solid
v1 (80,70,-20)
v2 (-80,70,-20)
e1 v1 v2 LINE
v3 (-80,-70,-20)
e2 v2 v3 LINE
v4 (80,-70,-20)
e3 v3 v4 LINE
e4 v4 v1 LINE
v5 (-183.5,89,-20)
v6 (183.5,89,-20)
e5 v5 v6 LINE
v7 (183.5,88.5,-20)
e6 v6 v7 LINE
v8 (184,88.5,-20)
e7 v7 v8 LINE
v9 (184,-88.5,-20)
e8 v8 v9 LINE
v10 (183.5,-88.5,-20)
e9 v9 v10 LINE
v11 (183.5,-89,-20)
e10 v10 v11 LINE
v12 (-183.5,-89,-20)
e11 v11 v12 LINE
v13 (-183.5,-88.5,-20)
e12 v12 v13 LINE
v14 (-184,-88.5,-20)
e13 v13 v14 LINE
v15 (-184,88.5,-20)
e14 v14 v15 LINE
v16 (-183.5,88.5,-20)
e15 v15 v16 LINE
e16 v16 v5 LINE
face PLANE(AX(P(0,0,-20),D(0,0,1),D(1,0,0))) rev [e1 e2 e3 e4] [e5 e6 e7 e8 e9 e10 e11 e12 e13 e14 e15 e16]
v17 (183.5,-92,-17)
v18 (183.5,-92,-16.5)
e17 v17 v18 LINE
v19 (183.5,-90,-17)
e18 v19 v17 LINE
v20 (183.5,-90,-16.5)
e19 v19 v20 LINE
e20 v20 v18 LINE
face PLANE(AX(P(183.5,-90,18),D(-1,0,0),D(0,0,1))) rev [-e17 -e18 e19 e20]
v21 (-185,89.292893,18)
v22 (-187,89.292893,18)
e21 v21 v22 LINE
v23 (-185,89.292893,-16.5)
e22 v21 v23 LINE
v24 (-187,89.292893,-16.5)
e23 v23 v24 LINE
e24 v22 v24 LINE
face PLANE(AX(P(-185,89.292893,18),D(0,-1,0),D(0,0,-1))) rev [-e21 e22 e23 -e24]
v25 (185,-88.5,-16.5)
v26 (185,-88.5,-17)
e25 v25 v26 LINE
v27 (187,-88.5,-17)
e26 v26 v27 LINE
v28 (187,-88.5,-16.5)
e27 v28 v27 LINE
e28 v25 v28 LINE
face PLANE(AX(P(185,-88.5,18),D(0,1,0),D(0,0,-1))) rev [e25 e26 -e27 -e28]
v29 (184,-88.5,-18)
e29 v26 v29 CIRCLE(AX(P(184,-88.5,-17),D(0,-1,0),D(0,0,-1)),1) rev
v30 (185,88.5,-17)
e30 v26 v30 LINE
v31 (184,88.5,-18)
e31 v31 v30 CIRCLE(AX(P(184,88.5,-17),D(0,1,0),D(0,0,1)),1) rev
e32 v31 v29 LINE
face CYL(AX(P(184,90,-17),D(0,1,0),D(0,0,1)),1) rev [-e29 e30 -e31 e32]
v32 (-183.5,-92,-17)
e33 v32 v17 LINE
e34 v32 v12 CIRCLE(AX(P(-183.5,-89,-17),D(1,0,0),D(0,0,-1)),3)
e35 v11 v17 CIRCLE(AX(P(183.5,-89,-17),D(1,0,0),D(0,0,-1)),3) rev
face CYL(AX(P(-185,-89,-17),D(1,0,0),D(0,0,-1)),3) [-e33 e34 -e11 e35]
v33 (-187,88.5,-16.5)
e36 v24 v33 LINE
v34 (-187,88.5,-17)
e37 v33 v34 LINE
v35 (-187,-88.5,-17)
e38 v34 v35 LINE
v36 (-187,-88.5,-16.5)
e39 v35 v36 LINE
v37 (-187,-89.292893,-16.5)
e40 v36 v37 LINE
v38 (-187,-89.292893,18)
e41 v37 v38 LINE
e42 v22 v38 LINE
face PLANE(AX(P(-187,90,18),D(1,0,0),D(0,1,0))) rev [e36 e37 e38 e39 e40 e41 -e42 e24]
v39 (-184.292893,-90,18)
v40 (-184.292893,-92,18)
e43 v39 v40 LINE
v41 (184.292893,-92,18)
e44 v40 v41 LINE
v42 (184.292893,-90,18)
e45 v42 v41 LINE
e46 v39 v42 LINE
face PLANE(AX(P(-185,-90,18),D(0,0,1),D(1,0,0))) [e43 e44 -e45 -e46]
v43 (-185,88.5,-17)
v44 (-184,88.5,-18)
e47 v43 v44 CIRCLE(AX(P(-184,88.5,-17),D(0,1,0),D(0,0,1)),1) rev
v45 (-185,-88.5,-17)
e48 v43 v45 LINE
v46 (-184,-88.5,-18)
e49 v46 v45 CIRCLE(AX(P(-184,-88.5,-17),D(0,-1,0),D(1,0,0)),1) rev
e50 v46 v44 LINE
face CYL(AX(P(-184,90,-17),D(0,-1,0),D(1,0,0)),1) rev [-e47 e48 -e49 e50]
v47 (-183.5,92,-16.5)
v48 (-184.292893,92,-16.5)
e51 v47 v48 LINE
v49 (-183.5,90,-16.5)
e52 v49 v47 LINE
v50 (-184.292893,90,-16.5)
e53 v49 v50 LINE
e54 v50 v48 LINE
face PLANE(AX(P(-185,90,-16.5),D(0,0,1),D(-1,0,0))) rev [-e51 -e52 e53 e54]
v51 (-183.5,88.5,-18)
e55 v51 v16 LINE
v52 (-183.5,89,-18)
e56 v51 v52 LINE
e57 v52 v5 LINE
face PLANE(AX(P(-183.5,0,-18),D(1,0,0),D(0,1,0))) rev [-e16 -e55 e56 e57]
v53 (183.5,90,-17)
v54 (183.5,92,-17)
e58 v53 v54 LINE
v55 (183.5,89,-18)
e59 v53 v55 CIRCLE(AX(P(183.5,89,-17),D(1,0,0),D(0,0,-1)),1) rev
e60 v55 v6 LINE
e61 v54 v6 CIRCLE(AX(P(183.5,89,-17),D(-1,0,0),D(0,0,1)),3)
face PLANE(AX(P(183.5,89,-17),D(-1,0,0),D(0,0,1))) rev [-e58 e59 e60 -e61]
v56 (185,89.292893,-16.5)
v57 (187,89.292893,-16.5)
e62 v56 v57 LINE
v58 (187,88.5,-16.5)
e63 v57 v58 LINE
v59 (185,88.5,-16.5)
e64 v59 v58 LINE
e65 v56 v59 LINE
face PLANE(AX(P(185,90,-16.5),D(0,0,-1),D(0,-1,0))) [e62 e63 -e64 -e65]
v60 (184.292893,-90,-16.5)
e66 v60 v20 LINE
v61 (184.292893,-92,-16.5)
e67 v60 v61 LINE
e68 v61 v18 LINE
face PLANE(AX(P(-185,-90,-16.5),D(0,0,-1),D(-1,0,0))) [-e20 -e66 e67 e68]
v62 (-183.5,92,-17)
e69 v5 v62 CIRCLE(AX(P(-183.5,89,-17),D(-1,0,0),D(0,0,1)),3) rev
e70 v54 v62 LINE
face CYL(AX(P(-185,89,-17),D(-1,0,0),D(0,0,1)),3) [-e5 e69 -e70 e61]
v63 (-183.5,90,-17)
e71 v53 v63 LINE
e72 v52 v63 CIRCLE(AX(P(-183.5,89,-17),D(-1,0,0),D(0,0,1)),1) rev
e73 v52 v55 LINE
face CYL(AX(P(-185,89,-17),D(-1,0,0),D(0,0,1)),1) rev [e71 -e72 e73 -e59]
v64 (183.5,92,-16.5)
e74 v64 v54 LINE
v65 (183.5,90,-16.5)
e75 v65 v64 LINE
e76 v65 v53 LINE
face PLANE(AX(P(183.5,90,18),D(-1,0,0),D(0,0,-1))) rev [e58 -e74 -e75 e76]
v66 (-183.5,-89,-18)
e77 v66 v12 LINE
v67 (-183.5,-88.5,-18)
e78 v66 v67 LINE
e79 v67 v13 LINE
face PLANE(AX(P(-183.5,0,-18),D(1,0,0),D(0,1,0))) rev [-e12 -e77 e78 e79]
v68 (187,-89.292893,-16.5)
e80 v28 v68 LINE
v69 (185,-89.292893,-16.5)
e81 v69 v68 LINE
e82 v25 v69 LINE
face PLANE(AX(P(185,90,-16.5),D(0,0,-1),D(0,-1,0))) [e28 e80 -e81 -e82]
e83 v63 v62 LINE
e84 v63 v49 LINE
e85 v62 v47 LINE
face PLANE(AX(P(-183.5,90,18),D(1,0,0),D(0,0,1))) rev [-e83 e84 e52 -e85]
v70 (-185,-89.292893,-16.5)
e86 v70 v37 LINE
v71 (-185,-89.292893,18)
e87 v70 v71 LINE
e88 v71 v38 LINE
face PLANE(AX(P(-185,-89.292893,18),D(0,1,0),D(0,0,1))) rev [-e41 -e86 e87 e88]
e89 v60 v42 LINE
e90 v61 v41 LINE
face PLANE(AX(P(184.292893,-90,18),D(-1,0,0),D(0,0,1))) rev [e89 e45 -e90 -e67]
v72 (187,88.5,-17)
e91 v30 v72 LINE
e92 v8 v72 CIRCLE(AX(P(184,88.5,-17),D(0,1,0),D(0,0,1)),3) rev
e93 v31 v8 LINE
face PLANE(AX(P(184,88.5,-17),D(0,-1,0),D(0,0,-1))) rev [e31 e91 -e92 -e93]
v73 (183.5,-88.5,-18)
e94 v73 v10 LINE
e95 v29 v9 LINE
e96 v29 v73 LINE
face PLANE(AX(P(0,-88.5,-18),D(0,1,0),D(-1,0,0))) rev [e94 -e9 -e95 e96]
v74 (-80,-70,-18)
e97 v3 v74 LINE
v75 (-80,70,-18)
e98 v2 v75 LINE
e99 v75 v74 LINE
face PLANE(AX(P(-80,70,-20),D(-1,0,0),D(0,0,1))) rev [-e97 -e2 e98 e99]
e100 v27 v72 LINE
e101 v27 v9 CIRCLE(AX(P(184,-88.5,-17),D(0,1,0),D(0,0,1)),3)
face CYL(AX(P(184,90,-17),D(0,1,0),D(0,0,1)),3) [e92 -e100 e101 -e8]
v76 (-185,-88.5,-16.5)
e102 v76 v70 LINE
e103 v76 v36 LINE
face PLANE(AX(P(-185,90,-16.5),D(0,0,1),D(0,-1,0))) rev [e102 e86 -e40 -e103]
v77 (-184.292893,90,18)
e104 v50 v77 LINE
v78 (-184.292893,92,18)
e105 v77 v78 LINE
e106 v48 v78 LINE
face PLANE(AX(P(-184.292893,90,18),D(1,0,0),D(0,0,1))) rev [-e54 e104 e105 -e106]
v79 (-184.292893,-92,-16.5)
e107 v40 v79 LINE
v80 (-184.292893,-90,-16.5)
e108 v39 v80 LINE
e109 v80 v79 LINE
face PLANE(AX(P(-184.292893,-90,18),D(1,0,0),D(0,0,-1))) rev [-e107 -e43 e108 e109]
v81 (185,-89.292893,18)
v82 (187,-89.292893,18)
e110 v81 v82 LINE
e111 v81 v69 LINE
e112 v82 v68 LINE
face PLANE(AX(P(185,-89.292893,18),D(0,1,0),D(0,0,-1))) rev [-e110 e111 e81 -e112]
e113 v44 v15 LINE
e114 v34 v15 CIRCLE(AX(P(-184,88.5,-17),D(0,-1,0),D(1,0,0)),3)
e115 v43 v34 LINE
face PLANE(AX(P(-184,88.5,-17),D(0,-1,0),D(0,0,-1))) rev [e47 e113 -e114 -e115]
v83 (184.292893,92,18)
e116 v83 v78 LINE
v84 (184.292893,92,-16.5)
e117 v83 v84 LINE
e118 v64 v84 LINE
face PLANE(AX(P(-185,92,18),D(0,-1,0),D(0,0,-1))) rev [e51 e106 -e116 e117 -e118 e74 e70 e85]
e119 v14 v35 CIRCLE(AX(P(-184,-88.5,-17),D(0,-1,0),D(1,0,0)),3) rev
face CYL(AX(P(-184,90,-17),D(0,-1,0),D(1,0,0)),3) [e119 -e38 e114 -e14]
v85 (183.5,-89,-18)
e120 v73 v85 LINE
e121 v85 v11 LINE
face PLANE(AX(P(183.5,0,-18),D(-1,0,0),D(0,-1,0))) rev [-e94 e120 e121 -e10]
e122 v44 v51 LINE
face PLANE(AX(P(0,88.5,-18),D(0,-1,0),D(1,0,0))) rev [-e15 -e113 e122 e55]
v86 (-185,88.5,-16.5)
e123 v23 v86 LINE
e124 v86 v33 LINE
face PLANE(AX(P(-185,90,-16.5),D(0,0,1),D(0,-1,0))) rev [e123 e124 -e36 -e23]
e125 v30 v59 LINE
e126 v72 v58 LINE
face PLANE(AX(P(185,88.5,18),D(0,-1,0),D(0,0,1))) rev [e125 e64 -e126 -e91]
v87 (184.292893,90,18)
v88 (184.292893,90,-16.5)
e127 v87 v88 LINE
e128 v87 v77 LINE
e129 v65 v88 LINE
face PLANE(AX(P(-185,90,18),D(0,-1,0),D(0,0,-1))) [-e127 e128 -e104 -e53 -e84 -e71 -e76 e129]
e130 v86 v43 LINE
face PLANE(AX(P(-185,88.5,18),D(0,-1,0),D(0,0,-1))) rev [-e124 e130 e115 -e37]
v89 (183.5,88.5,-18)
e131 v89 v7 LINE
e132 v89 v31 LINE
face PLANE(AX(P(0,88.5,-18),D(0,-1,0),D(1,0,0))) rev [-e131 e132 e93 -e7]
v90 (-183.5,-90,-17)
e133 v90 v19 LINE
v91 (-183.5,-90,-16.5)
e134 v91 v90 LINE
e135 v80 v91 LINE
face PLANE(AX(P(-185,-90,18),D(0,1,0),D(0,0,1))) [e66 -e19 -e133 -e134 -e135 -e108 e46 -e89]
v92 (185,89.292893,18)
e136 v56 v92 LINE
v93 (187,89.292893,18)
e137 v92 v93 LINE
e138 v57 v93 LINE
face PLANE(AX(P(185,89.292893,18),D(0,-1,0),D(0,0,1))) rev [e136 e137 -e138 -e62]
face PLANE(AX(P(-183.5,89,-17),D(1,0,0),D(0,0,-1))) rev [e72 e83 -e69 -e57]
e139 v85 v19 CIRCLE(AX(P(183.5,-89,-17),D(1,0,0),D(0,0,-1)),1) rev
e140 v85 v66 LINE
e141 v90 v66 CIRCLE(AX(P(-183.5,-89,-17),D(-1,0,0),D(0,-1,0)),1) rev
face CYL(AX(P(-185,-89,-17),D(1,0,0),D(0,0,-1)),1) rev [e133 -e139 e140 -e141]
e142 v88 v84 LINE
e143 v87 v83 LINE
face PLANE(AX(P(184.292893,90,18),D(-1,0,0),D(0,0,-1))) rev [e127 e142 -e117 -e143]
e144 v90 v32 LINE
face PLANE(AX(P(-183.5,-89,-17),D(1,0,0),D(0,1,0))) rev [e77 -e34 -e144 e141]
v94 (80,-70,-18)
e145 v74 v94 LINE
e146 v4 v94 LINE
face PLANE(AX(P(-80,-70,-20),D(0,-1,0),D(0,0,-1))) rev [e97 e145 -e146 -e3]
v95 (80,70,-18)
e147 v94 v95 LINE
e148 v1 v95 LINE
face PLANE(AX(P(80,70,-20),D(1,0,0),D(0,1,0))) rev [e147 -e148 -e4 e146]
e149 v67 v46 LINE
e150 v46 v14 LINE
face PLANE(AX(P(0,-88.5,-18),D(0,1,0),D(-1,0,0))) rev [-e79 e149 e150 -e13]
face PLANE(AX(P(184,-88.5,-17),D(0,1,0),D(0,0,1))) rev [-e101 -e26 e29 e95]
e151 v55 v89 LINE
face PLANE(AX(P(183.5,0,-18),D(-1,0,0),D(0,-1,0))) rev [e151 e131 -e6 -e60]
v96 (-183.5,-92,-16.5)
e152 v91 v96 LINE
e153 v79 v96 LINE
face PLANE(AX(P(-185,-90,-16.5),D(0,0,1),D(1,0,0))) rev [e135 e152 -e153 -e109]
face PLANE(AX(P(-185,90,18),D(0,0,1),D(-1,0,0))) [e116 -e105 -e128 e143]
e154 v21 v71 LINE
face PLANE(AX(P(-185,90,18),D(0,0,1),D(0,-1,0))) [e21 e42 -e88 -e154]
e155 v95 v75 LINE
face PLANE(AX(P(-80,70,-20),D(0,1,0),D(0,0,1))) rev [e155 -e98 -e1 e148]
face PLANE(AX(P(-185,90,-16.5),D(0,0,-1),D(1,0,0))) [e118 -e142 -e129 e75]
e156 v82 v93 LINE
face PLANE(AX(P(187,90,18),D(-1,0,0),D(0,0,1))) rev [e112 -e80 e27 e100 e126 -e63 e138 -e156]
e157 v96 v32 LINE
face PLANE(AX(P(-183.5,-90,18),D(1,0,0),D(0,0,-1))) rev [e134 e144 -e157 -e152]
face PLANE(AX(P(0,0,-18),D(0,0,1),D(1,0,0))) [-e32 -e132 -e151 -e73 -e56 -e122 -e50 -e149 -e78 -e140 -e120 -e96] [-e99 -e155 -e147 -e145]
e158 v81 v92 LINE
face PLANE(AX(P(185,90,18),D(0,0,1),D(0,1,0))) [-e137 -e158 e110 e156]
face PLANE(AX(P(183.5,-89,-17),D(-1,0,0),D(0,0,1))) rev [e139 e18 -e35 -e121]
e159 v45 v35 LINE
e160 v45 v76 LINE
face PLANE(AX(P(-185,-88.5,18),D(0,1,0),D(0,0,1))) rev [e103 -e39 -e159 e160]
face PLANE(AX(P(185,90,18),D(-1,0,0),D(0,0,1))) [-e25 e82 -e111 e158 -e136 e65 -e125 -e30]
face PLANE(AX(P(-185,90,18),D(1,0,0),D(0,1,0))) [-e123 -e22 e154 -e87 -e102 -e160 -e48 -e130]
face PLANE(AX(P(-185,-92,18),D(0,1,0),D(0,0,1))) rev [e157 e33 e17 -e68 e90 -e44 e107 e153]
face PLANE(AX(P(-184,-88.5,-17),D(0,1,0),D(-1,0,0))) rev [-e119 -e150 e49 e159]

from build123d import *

# Parameters (mm, degrees)
SKETCH1_W                    = 370
SKETCH1_H                    = 180
BOSS_EXTRUDE1_DEPTH          = 18
CONVERT_SOLID1_START         = -90
CONVERT_SOLID1_DEPTH         = 180
CONVERT_SOLID1_START_2       = -92
CONVERT_SOLID1_2_DEPTH       = 3.5
CONVERT_SOLID1_START_3       = 88.5
CONVERT_SOLID1_3_DEPTH       = 3.5
CONVERT_SOLID1_START_4       = -88.5
CONVERT_SOLID1_4_DEPTH       = 177
CONVERT_SOLID1_START_5       = -89
CONVERT_SOLID1_5_OUTLINE_W   = 367
CONVERT_SOLID1_5_OUTLINE_H   = 2
CONVERT_SOLID1_5_OUTLINE_W_2 = 2
CONVERT_SOLID1_5_OUTLINE_H_2 = 34.5
CONVERT_SOLID1_5_DEPTH       = 178
CONVERT_SOLID1_START_6       = -89.292893219
CONVERT_SOLID1_6_OUTLINE_W   = 2
CONVERT_SOLID1_6_OUTLINE_H   = 34.5
CONVERT_SOLID1_6_DEPTH       = 178.585786438
CONVERT_SOLID1_START_7       = -183.5
CONVERT_SOLID1_7_DEPTH       = 367
CONVERT_SOLID1_START_8       = -184.292893219
CONVERT_SOLID1_8_OUTLINE_W   = 2
CONVERT_SOLID1_8_OUTLINE_H   = 34.5
CONVERT_SOLID1_8_DEPTH       = 368.585786438
SKETCH6_W                    = 160
SKETCH6_H                    = 140
CUT_EXTRUDE1_DEPTH           = 36


with BuildPart() as part:
    # Sketch1 → Boss-Extrude1 (new, symmetric)
    with BuildSketch(Plane.XY):
        Rectangle(SKETCH1_W, SKETCH1_H)
    extrude(amount=BOSS_EXTRUDE1_DEPTH, both=True)

    # Convert-Solid1: read off the stored shape, not the designer's step
    # Convert-Solid1 outline → Convert-Solid1 (cut)
    with BuildSketch(Plane(origin=(0, 0, 0), x_dir=(1, 0, 0), z_dir=(0, 1, 0)).offset(CONVERT_SOLID1_START)):
        with BuildLine():
            ThreePointArc((-184, 18), (-184.707106781, 17.707106781), (-185, 17))
            Line((-185, 17), (-185, -18))
            Line((-185, -18), (185, -18))
            Line((185, -18), (185, 17))
            ThreePointArc((185, 17), (184.707106781, 17.707106781), (184, 18))
            Line((184, 18), (-184, 18))
        make_face()
    extrude(amount=CONVERT_SOLID1_DEPTH, mode=Mode.SUBTRACT)

    # Convert-Solid1 2 outline → Convert-Solid1 2 (cut)
    with BuildSketch(Plane(origin=(0, 0, 0), x_dir=(1, 0, 0), z_dir=(0, 1, 0)).offset(CONVERT_SOLID1_START_2)):
        with BuildLine():
            ThreePointArc((-185, 17), (-184.707106781, 17.707106781), (-184, 18))
            Line((-184, 18), (-185, 18))
            Line((-185, 18), (-185, 17))
        make_face()
        with BuildLine():
            Line((185, 18), (184, 18))
            ThreePointArc((184, 18), (184.707106781, 17.707106781), (185, 17))
            Line((185, 17), (185, 18))
        make_face()
    extrude(amount=CONVERT_SOLID1_2_DEPTH, mode=Mode.SUBTRACT)

    # Convert-Solid1 3 outline → Convert-Solid1 3 (cut)
    with BuildSketch(Plane(origin=(0, 0, 0), x_dir=(1, 0, 0), z_dir=(0, 1, 0)).offset(CONVERT_SOLID1_START_3)):
        with BuildLine():
            ThreePointArc((-185, 17), (-184.707106781, 17.707106781), (-184, 18))
            Line((-184, 18), (-185, 18))
            Line((-185, 18), (-185, 17))
        make_face()
        with BuildLine():
            Line((185, 18), (184, 18))
            ThreePointArc((184, 18), (184.707106781, 17.707106781), (185, 17))
            Line((185, 17), (185, 18))
        make_face()
    extrude(amount=CONVERT_SOLID1_3_DEPTH, mode=Mode.SUBTRACT)

    # Convert-Solid1 4 outline → Convert-Solid1 4 (add)
    with BuildSketch(Plane(origin=(0, 0, 0), x_dir=(1, 0, 0), z_dir=(0, 1, 0)).offset(CONVERT_SOLID1_START_4)):
        with BuildLine():
            Line((185, 18), (185, -18))
            Line((185, -18), (187, -18))
            Line((187, -18), (187, 17))
            ThreePointArc((187, 17), (186.121320344, 19.121320344), (184, 20))
            Line((184, 20), (-184, 20))
            ThreePointArc((-184, 20), (-186.121320344, 19.121320344), (-187, 17))
            Line((-187, 17), (-187, -18))
            Line((-187, -18), (-185, -18))
            Line((-185, -18), (-185, 18))
            Line((-185, 18), (185, 18))
        make_face()
    extrude(amount=CONVERT_SOLID1_4_DEPTH)

    # Convert-Solid1 5 outline → Convert-Solid1 5 (add)
    with BuildSketch(Plane(origin=(0, 0, 0), x_dir=(1, 0, 0), z_dir=(0, 1, 0)).offset(CONVERT_SOLID1_START_5)):
        with Locations((0, 19)):
            Rectangle(CONVERT_SOLID1_5_OUTLINE_W, CONVERT_SOLID1_5_OUTLINE_H)
        with Locations((-186, -0.75)):
            Rectangle(CONVERT_SOLID1_5_OUTLINE_W_2, CONVERT_SOLID1_5_OUTLINE_H_2)
        with Locations((186, -0.75)):
            Rectangle(CONVERT_SOLID1_5_OUTLINE_W_2, CONVERT_SOLID1_5_OUTLINE_H_2)
    extrude(amount=CONVERT_SOLID1_5_DEPTH)

    # Convert-Solid1 6 outline → Convert-Solid1 6 (add)
    with BuildSketch(Plane(origin=(0, 0, 0), x_dir=(1, 0, 0), z_dir=(0, 1, 0)).offset(CONVERT_SOLID1_START_6)):
        with Locations((-186, -0.75)):
            Rectangle(CONVERT_SOLID1_6_OUTLINE_W, CONVERT_SOLID1_6_OUTLINE_H)
        with Locations((186, -0.75)):
            Rectangle(CONVERT_SOLID1_6_OUTLINE_W, CONVERT_SOLID1_6_OUTLINE_H)
    extrude(amount=CONVERT_SOLID1_6_DEPTH)

    # Convert-Solid1 7 outline → Convert-Solid1 7 (add)
    with BuildSketch(Plane.YZ.offset(CONVERT_SOLID1_START_7)):
        with BuildLine():
            Line((92, -17), (92, 18))
            Line((92, 18), (90, 18))
            Line((90, 18), (90, -17))
            ThreePointArc((90, -17), (89.707106781, -17.707106781), (89, -18))
            Line((89, -18), (89, -20))
            ThreePointArc((89, -20), (91.121320344, -19.121320344), (92, -17))
        make_face()
        with BuildLine():
            Line((-92, 18), (-92, -17))
            ThreePointArc((-92, -17), (-91.121320344, -19.121320344), (-89, -20))
            Line((-89, -20), (-89, -18))
            ThreePointArc((-89, -18), (-89.707106781, -17.707106781), (-90, -17))
            Line((-90, -17), (-90, 18))
            Line((-90, 18), (-92, 18))
        make_face()
    extrude(amount=CONVERT_SOLID1_7_DEPTH)

    # Convert-Solid1 8 outline → Convert-Solid1 8 (add)
    with BuildSketch(Plane.YZ.offset(CONVERT_SOLID1_START_8)):
        with Locations((91, 0.75)):
            Rectangle(CONVERT_SOLID1_8_OUTLINE_W, CONVERT_SOLID1_8_OUTLINE_H)
        with Locations((-91, 0.75)):
            Rectangle(CONVERT_SOLID1_8_OUTLINE_W, CONVERT_SOLID1_8_OUTLINE_H)
    extrude(amount=CONVERT_SOLID1_8_DEPTH)

    # Sketch6 → Cut-Extrude1 (cut)
    with BuildSketch(Plane.XY.offset(-18)):
        Rectangle(SKETCH6_W, SKETCH6_H)
    extrude(amount=-CUT_EXTRUDE1_DEPTH, mode=Mode.SUBTRACT)


solid = part.part
